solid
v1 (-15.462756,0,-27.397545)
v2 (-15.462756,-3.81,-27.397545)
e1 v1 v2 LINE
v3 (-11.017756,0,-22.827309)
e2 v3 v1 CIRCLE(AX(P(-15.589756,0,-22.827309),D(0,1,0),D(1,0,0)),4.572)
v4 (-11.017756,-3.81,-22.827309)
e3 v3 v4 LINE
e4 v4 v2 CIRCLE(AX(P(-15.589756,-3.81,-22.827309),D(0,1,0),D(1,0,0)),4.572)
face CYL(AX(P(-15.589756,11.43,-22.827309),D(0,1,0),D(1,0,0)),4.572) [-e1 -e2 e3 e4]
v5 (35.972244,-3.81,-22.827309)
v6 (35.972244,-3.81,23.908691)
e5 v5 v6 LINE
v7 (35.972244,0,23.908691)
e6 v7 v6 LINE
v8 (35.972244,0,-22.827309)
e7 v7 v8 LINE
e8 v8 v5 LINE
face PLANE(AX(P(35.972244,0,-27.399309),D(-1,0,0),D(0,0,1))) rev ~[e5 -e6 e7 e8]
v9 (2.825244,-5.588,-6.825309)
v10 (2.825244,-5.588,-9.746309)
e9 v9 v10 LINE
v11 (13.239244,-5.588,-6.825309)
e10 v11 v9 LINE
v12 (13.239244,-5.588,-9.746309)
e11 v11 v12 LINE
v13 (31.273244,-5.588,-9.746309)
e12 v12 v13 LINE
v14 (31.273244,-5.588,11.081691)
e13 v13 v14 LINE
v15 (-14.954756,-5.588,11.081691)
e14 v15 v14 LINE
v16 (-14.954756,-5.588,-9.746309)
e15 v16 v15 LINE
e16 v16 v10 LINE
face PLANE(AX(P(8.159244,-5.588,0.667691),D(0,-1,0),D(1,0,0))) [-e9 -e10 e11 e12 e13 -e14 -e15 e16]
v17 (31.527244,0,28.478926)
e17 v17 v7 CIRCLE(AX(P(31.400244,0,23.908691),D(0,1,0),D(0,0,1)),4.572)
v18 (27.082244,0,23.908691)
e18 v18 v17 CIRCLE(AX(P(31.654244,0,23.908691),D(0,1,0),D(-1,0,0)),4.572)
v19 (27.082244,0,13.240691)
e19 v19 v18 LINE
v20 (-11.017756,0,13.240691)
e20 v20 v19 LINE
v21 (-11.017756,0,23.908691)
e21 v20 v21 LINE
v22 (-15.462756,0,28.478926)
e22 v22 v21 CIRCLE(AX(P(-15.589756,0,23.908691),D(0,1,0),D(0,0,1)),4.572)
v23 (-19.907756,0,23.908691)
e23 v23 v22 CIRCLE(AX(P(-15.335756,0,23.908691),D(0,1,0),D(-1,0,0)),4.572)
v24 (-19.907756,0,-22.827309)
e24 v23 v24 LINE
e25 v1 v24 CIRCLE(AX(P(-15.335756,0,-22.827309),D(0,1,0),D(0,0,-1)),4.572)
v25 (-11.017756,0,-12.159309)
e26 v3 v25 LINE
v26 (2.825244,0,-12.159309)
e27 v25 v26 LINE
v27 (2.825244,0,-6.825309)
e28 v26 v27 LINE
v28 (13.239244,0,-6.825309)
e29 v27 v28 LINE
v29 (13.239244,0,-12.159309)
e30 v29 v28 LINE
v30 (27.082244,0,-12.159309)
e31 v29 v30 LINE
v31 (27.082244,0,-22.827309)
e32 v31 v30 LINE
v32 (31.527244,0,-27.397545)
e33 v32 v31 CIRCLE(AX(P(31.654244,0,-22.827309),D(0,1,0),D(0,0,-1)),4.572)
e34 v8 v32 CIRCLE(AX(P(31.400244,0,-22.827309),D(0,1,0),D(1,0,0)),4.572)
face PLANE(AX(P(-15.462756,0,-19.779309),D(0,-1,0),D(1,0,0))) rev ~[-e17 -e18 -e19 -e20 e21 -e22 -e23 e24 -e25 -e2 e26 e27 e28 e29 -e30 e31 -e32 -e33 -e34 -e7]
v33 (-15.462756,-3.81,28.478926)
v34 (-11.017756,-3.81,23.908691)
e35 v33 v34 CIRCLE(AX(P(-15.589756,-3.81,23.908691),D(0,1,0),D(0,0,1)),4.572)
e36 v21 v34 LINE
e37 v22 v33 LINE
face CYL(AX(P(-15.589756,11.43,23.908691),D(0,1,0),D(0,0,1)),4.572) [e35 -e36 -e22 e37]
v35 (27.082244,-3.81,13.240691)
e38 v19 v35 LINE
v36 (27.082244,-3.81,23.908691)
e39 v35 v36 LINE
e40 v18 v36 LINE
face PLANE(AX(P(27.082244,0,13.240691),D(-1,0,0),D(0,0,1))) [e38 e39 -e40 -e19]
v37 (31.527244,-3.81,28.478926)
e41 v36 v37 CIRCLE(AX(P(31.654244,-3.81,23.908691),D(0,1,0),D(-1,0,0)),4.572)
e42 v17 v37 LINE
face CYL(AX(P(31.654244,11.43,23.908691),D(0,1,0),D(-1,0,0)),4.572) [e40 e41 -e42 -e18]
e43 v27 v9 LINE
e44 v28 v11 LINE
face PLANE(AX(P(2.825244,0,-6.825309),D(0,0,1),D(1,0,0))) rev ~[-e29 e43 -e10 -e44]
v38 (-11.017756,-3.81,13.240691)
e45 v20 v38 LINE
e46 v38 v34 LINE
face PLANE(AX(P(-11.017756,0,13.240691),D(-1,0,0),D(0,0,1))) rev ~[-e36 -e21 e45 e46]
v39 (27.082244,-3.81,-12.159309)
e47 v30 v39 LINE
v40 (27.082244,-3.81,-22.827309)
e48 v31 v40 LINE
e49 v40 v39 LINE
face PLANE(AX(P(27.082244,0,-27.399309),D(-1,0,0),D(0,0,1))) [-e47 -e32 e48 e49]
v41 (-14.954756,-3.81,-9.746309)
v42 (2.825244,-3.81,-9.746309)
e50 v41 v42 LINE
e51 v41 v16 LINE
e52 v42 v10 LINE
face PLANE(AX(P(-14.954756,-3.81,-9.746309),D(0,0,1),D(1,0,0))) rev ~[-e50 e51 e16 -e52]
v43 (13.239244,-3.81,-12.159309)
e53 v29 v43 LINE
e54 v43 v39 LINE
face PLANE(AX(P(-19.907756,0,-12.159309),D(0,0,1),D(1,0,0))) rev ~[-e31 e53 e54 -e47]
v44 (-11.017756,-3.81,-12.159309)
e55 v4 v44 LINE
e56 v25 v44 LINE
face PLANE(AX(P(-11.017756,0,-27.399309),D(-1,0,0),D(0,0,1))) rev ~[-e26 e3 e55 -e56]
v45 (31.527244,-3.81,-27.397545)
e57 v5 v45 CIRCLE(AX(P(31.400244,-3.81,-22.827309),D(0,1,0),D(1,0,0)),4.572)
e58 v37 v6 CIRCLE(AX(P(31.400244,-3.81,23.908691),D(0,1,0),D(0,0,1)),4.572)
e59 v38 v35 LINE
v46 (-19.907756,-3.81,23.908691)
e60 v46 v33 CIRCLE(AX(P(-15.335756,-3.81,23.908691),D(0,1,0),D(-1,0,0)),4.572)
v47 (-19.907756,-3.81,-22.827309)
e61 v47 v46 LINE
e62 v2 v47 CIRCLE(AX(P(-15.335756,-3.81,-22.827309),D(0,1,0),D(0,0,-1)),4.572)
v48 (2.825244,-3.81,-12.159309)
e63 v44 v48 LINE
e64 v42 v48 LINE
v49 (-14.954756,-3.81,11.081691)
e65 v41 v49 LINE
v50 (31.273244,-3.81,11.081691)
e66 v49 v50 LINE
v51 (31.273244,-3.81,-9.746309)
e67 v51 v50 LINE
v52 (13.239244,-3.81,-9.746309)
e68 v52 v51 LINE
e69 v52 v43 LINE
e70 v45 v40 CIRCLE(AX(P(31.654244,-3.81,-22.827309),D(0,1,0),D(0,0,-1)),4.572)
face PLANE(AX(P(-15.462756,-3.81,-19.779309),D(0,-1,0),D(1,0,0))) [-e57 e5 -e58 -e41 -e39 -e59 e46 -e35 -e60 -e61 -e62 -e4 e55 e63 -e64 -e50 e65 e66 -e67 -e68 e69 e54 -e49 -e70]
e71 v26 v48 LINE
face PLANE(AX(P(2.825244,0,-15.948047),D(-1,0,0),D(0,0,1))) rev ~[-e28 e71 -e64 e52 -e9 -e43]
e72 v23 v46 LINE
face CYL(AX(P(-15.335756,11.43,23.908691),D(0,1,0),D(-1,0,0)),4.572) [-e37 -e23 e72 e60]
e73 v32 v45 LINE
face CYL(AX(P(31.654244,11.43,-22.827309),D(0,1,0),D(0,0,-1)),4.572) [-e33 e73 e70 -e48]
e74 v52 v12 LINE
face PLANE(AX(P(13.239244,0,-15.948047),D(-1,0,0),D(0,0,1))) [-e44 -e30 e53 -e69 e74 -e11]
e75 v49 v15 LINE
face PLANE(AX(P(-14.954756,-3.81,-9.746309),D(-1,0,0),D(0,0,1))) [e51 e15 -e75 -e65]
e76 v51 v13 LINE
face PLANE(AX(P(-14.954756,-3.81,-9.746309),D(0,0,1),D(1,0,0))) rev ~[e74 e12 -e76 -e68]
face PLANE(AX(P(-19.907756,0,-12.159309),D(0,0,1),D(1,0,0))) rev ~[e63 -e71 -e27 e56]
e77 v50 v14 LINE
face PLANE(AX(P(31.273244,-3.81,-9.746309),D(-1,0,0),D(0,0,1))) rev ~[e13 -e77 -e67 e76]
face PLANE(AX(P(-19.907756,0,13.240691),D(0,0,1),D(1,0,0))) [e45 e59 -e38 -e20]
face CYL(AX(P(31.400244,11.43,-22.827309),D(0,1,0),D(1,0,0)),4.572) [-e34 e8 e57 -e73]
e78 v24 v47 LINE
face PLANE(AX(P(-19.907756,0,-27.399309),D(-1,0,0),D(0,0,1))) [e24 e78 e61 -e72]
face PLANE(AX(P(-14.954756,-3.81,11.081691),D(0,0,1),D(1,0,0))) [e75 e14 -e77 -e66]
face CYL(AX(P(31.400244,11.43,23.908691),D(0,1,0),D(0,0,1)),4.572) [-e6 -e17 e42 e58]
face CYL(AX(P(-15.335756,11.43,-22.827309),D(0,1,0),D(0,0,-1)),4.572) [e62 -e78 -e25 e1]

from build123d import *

# Parameters (mm, degrees)
F0_W         = 55.88
F0_H         = 25.4
F1_DEPTH     = 3.81
F2_W         = 46.228
F2_H         = 20.828
F3_DEPTH     = 1.778
F4_W         = 10.414
F4_H         = 9.1227373774
F5_DEPTH     = 25.4
F6_W         = 8.89
F6_H         = 15.24
F7_DEPTH     = 3.81
F8_T1_DEPTH  = 26.67
F10_W        = 8.89
F10_H        = 15.24
F11_DEPTH    = 3.81
F12_T1_DEPTH = 26.67
F13_W        = 8.89
F13_H        = 15.24
F14_DEPTH    = 3.81
F15_T1_DEPTH = 26.67
F16_W        = 8.89
F16_H        = 15.24
F17_DEPTH    = 3.81
F18_T1_DEPTH = 26.67


# Not quite as in the source:
# - a fillet or chamfer that OpenCascade refuses, or shapes differently, is made with other operations: its cross-section is extruded or revolved along the edge and cut away or added


with BuildPart() as f1:
    # F0 (on Front) → F1 (new body)
    with BuildSketch(Plane.XZ):
        with Locations((8.0322436088, 0.5406907029)):
            Rectangle(F0_W, F0_H)
    extrude(amount=F1_DEPTH)

    # F2 (on face) → F3 (join)
    with BuildSketch(Plane.XZ.offset(3.81)):
        with Locations((8.1592436088, 0.6676907029)):
            Rectangle(F2_W, F2_H)
    extrude(amount=F3_DEPTH)

    # F4 (on face) → F5 (cut)
    with BuildSketch(Plane.XZ):
        with Locations((8.0322436088, -11.3866779858)):
            Rectangle(F4_W, F4_H)
    extrude(amount=F5_DEPTH, mode=Mode.SUBTRACT)

    # F6 (on face) → F7 (join)
    with BuildSketch(Plane.XZ):
        with Locations((31.5272436088, 20.8606907029)):
            Rectangle(F6_W, F6_H)
    extrude(amount=F7_DEPTH)

    # F8: fillet of radius 4.572 on 2 edges, made by hand

    # F8_s2 → F8_t1 (cut)
    with BuildSketch(Plane.XZ.offset(-11.43)):
        with BuildLine():
            ThreePointArc((31.4002436088, 28.4806907029), (34.6331358124, 27.1415829065), (35.9722436088, 23.9086907029))
            Line((35.9722436088, 23.9086907029), (35.9722436088, 28.4806907029))
            Line((35.9722436088, 28.4806907029), (31.4002436088, 28.4806907029))
        make_face()
        with BuildLine():
            ThreePointArc((27.0822436088, 23.9086907029), (28.4213514052, 27.1415829065), (31.6542436088, 28.4806907029))
            Line((31.6542436088, 28.4806907029), (27.0822436088, 28.4806907029))
            Line((27.0822436088, 28.4806907029), (27.0822436088, 23.9086907029))
        make_face()
    extrude(amount=F8_T1_DEPTH, mode=Mode.SUBTRACT)

    # F10 (on face) → F11 (join)
    with BuildSketch(Plane.XZ):
        with Locations((-15.4627563912, 20.8606907029)):
            Rectangle(F10_W, F10_H)
    extrude(amount=F11_DEPTH)

    # F12: fillet of radius 4.572 on 2 edges, made by hand

    # F12_s2 → F12_t1 (cut)
    with BuildSketch(Plane.XZ.offset(-11.43)):
        with BuildLine():
            ThreePointArc((-19.9077563912, 23.9086907029), (-18.5686485948, 27.1415829065), (-15.3357563912, 28.4806907029))
            Line((-15.3357563912, 28.4806907029), (-19.9077563912, 28.4806907029))
            Line((-19.9077563912, 28.4806907029), (-19.9077563912, 23.9086907029))
        make_face()
        with BuildLine():
            ThreePointArc((-15.5897563912, 28.4806907029), (-12.3568641876, 27.1415829065), (-11.0177563912, 23.9086907029))
            Line((-11.0177563912, 23.9086907029), (-11.0177563912, 28.4806907029))
            Line((-11.0177563912, 28.4806907029), (-15.5897563912, 28.4806907029))
        make_face()
    extrude(amount=F12_T1_DEPTH, mode=Mode.SUBTRACT)

    # F13 (on face) → F14 (join)
    with BuildSketch(Plane.XZ):
        with Locations((31.5272436088, -19.7793092971)):
            Rectangle(F13_W, F13_H)
    extrude(amount=F14_DEPTH)

    # F15: fillet of radius 4.572 on 2 edges, made by hand

    # F15_s2 → F15_t1 (cut)
    with BuildSketch(Plane.XZ.offset(-11.43)):
        with BuildLine():
            ThreePointArc((35.9722436088, -22.8273092971), (34.6331358124, -26.0602015007), (31.4002436088, -27.3993092971))
            Line((31.4002436088, -27.3993092971), (35.9722436088, -27.3993092971))
            Line((35.9722436088, -27.3993092971), (35.9722436088, -22.8273092971))
        make_face()
        with BuildLine():
            ThreePointArc((31.6542436088, -27.3993092971), (28.4213514052, -26.0602015007), (27.0822436088, -22.8273092971))
            Line((27.0822436088, -22.8273092971), (27.0822436088, -27.3993092971))
            Line((27.0822436088, -27.3993092971), (31.6542436088, -27.3993092971))
        make_face()
    extrude(amount=F15_T1_DEPTH, mode=Mode.SUBTRACT)

    # F16 (on face) → F17 (join)
    with BuildSketch(Plane.XZ):
        with Locations((-15.4627563912, -19.7793092971)):
            Rectangle(F16_W, F16_H)
    extrude(amount=F17_DEPTH)

    # F18: fillet of radius 4.572 on 2 edges, made by hand

    # F18_s2 → F18_t1 (cut)
    with BuildSketch(Plane.XZ.offset(-11.43)):
        with BuildLine():
            ThreePointArc((-15.3357563912, -27.3993092971), (-18.5686485948, -26.0602015007), (-19.9077563912, -22.8273092971))
            Line((-19.9077563912, -22.8273092971), (-19.9077563912, -27.3993092971))
            Line((-19.9077563912, -27.3993092971), (-15.3357563912, -27.3993092971))
        make_face()
        with BuildLine():
            ThreePointArc((-11.0177563912, -22.8273092971), (-12.3568641876, -26.0602015007), (-15.5897563912, -27.3993092971))
            Line((-15.5897563912, -27.3993092971), (-11.0177563912, -27.3993092971))
            Line((-11.0177563912, -27.3993092971), (-11.0177563912, -22.8273092971))
        make_face()
    extrude(amount=F18_T1_DEPTH, mode=Mode.SUBTRACT)


solid = f1.part
